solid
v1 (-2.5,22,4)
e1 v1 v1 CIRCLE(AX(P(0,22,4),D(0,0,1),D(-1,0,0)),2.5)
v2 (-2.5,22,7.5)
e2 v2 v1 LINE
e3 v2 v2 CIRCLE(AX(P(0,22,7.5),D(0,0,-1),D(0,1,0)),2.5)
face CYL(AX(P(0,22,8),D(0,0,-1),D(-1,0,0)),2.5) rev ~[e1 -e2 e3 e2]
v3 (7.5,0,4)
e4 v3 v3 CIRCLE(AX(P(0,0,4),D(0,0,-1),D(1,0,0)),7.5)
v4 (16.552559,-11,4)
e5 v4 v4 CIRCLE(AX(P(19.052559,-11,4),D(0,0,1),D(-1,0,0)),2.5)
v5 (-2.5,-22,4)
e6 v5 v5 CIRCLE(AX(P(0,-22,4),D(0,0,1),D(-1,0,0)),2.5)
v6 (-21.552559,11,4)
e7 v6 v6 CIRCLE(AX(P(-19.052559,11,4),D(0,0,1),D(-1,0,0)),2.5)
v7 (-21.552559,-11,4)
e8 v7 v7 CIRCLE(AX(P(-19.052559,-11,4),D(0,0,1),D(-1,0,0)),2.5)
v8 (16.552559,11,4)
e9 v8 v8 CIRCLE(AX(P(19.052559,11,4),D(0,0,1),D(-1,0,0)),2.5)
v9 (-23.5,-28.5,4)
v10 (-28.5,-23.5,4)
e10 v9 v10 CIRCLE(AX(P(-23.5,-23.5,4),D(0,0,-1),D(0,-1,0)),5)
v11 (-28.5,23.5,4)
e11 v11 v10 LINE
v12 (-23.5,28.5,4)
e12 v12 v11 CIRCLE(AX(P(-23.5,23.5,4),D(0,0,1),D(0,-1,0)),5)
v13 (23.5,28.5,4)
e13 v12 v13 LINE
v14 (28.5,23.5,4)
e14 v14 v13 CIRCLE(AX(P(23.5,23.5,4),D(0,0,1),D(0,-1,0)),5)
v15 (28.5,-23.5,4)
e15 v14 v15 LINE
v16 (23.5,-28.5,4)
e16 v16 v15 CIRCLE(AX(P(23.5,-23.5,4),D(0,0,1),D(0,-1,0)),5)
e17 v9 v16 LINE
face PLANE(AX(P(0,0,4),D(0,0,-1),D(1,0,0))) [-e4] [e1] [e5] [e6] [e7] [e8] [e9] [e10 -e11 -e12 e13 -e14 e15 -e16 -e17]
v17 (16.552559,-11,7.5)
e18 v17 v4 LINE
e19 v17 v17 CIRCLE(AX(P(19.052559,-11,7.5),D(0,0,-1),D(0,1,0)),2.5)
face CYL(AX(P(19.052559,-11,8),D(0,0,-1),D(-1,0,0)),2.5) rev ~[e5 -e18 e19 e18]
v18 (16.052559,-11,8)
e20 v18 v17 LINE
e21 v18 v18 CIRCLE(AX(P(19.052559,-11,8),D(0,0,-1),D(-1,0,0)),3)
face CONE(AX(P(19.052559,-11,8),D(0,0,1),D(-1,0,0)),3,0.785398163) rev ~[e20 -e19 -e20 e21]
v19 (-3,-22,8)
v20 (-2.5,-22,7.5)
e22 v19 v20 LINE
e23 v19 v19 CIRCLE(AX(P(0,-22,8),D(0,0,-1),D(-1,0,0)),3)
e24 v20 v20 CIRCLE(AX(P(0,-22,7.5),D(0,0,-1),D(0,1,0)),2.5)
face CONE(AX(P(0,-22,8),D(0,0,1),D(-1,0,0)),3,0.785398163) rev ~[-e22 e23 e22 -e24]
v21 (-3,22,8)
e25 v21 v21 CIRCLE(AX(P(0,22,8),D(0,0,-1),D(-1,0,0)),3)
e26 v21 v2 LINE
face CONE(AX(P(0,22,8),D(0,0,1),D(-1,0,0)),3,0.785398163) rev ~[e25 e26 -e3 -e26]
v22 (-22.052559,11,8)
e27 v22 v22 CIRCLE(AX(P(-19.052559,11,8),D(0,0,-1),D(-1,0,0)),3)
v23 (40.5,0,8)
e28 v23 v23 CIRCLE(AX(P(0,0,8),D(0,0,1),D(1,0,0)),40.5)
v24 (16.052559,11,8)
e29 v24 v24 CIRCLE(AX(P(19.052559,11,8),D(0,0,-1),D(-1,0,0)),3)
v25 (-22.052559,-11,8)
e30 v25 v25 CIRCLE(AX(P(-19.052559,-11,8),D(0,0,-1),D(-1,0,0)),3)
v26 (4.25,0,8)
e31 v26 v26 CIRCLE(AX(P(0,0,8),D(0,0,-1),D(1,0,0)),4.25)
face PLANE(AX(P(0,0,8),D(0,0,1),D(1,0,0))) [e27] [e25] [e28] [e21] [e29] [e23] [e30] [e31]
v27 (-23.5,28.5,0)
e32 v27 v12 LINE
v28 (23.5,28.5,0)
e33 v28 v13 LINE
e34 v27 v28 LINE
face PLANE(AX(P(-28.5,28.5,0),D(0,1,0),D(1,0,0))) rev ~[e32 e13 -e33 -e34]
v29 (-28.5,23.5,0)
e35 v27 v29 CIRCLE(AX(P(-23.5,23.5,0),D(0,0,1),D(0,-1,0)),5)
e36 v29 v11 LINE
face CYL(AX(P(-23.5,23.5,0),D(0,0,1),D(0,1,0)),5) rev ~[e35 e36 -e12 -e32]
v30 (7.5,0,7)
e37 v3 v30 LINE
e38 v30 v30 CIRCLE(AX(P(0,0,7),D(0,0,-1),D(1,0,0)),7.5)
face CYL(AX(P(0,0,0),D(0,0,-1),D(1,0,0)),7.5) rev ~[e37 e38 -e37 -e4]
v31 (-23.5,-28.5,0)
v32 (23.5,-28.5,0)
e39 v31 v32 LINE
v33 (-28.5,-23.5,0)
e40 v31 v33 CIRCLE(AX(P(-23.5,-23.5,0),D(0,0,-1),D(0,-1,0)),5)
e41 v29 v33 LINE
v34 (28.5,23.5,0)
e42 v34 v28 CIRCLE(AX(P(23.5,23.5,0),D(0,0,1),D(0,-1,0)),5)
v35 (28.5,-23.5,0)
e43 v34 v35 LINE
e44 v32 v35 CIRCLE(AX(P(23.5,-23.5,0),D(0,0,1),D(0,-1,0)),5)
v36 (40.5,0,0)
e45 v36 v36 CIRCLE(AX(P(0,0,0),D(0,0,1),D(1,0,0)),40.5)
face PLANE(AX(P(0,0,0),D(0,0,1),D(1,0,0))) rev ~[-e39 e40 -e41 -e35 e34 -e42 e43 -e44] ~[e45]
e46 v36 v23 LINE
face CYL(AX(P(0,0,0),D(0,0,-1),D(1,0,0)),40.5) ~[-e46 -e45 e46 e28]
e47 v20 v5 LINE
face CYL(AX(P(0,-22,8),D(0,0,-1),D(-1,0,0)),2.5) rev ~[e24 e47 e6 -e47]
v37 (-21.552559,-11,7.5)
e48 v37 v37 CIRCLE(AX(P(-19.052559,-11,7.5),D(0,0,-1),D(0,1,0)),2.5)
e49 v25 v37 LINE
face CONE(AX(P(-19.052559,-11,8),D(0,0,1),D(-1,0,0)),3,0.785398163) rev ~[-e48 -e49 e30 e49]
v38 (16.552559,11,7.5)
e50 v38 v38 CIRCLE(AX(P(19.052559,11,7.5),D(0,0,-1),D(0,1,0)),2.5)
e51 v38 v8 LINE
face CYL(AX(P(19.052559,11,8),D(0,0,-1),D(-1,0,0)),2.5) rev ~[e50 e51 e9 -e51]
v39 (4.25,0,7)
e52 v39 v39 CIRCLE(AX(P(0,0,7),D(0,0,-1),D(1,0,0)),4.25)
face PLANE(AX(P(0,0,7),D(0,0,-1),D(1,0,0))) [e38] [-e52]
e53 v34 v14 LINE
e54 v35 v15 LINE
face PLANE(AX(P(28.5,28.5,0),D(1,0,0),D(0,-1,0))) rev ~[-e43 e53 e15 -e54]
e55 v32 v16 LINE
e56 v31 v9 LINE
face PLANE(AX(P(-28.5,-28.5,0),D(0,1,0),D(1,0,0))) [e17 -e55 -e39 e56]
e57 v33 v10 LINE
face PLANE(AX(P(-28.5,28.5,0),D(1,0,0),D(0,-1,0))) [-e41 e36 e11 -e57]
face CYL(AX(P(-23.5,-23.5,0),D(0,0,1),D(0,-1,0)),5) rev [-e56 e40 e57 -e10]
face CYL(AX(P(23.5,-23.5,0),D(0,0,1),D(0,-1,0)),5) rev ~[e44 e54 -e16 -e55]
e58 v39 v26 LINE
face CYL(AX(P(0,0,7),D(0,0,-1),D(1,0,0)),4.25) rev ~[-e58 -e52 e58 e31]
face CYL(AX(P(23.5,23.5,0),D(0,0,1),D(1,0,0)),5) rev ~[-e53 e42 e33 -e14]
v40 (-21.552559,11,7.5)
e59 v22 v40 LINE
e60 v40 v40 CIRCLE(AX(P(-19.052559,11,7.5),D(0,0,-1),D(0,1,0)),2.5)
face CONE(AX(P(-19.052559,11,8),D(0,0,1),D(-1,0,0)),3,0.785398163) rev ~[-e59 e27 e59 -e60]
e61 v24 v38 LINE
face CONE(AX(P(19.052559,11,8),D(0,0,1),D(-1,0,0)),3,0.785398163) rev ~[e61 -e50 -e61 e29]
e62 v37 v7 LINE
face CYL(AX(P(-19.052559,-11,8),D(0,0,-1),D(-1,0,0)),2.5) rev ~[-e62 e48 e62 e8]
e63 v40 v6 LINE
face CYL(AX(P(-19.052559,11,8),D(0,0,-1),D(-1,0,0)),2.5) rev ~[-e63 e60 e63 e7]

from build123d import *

# Parameters (mm, degrees)
F0_R           = 40.5
F1_DEPTH       = 8
F3_D           = 5
F3_CSINK_D     = 6
F3_CSINK_ANGLE = 90
F4_R           = 7.5
F5_DEPTH       = 7
F6_R           = 4.25
F7_DEPTH       = 1.001
F8_W           = 57
F8_H           = 57
F8_R           = 2.5
F8_R_2         = 7.5
F9_DEPTH       = 4
F10_R          = 5


# Not quite as in the source:
# - a feature names something its author has since deleted; it is built from what else it names


with BuildPart() as f1:
    # F0 (on Top) → F1 (new body)
    with BuildSketch(Plane.XY):
        Circle(F0_R)
    extrude(amount=F1_DEPTH)

    # F3 (through all)
    with Locations(Plane.XY.offset(8)):
        with Locations((0, 22), (19.0525588833, 11), (19.0525588833, -11), (0, -22), (-19.0525588833, -11), (-19.0525588833, 11)):
            CounterSinkHole(F3_D / 2, F3_CSINK_D / 2, counter_sink_angle=F3_CSINK_ANGLE)

    # F4 (on face) → F5 (cut)
    with BuildSketch(Plane(origin=(0, 0, 0), x_dir=(1, 0, 0), z_dir=(0, 0, -1))):
        Circle(F4_R)
    extrude(amount=-F5_DEPTH, mode=Mode.SUBTRACT)

    # F6 (on face) → F7 (cut, through all)
    with BuildSketch(Plane(origin=(0, 0, 7), x_dir=(1, 0, 0), z_dir=(0, 0, -1))):
        Circle(F6_R)
    extrude(amount=-F7_DEPTH, mode=Mode.SUBTRACT)

    # F8 (on face) → F9 (cut)
    with BuildSketch(Plane(origin=(0, 0, 0), x_dir=(1, 0, 0), z_dir=(0, 0, -1))):
        Rectangle(F8_W, F8_H)
        with Locations((-19.0525588833, -11)):
            Circle(F8_R, mode=Mode.SUBTRACT)
        with Locations((0, -22)):
            Circle(F8_R, mode=Mode.SUBTRACT)
        with Locations((19.0525588833, -11)):
            Circle(F8_R, mode=Mode.SUBTRACT)
        with Locations((-19.0525588833, 11)):
            Circle(F8_R, mode=Mode.SUBTRACT)
        Circle(F8_R_2, mode=Mode.SUBTRACT)
        with Locations((19.0525588833, 11)):
            Circle(F8_R, mode=Mode.SUBTRACT)
        with Locations((0, 22)):
            Circle(F8_R, mode=Mode.SUBTRACT)
    extrude(amount=-F9_DEPTH, mode=Mode.SUBTRACT)

    # F10
    f10_edges = [f1.edges().sort_by_distance(p)[0] for p in [
        (28.5, 28.5, 2),
        (28.5, -28.5, 2),
        (-28.5, -28.5, 2),
        (-28.5, 28.5, 2),
    ]]
    fillet(f10_edges, radius=F10_R)


solid = f1.part
